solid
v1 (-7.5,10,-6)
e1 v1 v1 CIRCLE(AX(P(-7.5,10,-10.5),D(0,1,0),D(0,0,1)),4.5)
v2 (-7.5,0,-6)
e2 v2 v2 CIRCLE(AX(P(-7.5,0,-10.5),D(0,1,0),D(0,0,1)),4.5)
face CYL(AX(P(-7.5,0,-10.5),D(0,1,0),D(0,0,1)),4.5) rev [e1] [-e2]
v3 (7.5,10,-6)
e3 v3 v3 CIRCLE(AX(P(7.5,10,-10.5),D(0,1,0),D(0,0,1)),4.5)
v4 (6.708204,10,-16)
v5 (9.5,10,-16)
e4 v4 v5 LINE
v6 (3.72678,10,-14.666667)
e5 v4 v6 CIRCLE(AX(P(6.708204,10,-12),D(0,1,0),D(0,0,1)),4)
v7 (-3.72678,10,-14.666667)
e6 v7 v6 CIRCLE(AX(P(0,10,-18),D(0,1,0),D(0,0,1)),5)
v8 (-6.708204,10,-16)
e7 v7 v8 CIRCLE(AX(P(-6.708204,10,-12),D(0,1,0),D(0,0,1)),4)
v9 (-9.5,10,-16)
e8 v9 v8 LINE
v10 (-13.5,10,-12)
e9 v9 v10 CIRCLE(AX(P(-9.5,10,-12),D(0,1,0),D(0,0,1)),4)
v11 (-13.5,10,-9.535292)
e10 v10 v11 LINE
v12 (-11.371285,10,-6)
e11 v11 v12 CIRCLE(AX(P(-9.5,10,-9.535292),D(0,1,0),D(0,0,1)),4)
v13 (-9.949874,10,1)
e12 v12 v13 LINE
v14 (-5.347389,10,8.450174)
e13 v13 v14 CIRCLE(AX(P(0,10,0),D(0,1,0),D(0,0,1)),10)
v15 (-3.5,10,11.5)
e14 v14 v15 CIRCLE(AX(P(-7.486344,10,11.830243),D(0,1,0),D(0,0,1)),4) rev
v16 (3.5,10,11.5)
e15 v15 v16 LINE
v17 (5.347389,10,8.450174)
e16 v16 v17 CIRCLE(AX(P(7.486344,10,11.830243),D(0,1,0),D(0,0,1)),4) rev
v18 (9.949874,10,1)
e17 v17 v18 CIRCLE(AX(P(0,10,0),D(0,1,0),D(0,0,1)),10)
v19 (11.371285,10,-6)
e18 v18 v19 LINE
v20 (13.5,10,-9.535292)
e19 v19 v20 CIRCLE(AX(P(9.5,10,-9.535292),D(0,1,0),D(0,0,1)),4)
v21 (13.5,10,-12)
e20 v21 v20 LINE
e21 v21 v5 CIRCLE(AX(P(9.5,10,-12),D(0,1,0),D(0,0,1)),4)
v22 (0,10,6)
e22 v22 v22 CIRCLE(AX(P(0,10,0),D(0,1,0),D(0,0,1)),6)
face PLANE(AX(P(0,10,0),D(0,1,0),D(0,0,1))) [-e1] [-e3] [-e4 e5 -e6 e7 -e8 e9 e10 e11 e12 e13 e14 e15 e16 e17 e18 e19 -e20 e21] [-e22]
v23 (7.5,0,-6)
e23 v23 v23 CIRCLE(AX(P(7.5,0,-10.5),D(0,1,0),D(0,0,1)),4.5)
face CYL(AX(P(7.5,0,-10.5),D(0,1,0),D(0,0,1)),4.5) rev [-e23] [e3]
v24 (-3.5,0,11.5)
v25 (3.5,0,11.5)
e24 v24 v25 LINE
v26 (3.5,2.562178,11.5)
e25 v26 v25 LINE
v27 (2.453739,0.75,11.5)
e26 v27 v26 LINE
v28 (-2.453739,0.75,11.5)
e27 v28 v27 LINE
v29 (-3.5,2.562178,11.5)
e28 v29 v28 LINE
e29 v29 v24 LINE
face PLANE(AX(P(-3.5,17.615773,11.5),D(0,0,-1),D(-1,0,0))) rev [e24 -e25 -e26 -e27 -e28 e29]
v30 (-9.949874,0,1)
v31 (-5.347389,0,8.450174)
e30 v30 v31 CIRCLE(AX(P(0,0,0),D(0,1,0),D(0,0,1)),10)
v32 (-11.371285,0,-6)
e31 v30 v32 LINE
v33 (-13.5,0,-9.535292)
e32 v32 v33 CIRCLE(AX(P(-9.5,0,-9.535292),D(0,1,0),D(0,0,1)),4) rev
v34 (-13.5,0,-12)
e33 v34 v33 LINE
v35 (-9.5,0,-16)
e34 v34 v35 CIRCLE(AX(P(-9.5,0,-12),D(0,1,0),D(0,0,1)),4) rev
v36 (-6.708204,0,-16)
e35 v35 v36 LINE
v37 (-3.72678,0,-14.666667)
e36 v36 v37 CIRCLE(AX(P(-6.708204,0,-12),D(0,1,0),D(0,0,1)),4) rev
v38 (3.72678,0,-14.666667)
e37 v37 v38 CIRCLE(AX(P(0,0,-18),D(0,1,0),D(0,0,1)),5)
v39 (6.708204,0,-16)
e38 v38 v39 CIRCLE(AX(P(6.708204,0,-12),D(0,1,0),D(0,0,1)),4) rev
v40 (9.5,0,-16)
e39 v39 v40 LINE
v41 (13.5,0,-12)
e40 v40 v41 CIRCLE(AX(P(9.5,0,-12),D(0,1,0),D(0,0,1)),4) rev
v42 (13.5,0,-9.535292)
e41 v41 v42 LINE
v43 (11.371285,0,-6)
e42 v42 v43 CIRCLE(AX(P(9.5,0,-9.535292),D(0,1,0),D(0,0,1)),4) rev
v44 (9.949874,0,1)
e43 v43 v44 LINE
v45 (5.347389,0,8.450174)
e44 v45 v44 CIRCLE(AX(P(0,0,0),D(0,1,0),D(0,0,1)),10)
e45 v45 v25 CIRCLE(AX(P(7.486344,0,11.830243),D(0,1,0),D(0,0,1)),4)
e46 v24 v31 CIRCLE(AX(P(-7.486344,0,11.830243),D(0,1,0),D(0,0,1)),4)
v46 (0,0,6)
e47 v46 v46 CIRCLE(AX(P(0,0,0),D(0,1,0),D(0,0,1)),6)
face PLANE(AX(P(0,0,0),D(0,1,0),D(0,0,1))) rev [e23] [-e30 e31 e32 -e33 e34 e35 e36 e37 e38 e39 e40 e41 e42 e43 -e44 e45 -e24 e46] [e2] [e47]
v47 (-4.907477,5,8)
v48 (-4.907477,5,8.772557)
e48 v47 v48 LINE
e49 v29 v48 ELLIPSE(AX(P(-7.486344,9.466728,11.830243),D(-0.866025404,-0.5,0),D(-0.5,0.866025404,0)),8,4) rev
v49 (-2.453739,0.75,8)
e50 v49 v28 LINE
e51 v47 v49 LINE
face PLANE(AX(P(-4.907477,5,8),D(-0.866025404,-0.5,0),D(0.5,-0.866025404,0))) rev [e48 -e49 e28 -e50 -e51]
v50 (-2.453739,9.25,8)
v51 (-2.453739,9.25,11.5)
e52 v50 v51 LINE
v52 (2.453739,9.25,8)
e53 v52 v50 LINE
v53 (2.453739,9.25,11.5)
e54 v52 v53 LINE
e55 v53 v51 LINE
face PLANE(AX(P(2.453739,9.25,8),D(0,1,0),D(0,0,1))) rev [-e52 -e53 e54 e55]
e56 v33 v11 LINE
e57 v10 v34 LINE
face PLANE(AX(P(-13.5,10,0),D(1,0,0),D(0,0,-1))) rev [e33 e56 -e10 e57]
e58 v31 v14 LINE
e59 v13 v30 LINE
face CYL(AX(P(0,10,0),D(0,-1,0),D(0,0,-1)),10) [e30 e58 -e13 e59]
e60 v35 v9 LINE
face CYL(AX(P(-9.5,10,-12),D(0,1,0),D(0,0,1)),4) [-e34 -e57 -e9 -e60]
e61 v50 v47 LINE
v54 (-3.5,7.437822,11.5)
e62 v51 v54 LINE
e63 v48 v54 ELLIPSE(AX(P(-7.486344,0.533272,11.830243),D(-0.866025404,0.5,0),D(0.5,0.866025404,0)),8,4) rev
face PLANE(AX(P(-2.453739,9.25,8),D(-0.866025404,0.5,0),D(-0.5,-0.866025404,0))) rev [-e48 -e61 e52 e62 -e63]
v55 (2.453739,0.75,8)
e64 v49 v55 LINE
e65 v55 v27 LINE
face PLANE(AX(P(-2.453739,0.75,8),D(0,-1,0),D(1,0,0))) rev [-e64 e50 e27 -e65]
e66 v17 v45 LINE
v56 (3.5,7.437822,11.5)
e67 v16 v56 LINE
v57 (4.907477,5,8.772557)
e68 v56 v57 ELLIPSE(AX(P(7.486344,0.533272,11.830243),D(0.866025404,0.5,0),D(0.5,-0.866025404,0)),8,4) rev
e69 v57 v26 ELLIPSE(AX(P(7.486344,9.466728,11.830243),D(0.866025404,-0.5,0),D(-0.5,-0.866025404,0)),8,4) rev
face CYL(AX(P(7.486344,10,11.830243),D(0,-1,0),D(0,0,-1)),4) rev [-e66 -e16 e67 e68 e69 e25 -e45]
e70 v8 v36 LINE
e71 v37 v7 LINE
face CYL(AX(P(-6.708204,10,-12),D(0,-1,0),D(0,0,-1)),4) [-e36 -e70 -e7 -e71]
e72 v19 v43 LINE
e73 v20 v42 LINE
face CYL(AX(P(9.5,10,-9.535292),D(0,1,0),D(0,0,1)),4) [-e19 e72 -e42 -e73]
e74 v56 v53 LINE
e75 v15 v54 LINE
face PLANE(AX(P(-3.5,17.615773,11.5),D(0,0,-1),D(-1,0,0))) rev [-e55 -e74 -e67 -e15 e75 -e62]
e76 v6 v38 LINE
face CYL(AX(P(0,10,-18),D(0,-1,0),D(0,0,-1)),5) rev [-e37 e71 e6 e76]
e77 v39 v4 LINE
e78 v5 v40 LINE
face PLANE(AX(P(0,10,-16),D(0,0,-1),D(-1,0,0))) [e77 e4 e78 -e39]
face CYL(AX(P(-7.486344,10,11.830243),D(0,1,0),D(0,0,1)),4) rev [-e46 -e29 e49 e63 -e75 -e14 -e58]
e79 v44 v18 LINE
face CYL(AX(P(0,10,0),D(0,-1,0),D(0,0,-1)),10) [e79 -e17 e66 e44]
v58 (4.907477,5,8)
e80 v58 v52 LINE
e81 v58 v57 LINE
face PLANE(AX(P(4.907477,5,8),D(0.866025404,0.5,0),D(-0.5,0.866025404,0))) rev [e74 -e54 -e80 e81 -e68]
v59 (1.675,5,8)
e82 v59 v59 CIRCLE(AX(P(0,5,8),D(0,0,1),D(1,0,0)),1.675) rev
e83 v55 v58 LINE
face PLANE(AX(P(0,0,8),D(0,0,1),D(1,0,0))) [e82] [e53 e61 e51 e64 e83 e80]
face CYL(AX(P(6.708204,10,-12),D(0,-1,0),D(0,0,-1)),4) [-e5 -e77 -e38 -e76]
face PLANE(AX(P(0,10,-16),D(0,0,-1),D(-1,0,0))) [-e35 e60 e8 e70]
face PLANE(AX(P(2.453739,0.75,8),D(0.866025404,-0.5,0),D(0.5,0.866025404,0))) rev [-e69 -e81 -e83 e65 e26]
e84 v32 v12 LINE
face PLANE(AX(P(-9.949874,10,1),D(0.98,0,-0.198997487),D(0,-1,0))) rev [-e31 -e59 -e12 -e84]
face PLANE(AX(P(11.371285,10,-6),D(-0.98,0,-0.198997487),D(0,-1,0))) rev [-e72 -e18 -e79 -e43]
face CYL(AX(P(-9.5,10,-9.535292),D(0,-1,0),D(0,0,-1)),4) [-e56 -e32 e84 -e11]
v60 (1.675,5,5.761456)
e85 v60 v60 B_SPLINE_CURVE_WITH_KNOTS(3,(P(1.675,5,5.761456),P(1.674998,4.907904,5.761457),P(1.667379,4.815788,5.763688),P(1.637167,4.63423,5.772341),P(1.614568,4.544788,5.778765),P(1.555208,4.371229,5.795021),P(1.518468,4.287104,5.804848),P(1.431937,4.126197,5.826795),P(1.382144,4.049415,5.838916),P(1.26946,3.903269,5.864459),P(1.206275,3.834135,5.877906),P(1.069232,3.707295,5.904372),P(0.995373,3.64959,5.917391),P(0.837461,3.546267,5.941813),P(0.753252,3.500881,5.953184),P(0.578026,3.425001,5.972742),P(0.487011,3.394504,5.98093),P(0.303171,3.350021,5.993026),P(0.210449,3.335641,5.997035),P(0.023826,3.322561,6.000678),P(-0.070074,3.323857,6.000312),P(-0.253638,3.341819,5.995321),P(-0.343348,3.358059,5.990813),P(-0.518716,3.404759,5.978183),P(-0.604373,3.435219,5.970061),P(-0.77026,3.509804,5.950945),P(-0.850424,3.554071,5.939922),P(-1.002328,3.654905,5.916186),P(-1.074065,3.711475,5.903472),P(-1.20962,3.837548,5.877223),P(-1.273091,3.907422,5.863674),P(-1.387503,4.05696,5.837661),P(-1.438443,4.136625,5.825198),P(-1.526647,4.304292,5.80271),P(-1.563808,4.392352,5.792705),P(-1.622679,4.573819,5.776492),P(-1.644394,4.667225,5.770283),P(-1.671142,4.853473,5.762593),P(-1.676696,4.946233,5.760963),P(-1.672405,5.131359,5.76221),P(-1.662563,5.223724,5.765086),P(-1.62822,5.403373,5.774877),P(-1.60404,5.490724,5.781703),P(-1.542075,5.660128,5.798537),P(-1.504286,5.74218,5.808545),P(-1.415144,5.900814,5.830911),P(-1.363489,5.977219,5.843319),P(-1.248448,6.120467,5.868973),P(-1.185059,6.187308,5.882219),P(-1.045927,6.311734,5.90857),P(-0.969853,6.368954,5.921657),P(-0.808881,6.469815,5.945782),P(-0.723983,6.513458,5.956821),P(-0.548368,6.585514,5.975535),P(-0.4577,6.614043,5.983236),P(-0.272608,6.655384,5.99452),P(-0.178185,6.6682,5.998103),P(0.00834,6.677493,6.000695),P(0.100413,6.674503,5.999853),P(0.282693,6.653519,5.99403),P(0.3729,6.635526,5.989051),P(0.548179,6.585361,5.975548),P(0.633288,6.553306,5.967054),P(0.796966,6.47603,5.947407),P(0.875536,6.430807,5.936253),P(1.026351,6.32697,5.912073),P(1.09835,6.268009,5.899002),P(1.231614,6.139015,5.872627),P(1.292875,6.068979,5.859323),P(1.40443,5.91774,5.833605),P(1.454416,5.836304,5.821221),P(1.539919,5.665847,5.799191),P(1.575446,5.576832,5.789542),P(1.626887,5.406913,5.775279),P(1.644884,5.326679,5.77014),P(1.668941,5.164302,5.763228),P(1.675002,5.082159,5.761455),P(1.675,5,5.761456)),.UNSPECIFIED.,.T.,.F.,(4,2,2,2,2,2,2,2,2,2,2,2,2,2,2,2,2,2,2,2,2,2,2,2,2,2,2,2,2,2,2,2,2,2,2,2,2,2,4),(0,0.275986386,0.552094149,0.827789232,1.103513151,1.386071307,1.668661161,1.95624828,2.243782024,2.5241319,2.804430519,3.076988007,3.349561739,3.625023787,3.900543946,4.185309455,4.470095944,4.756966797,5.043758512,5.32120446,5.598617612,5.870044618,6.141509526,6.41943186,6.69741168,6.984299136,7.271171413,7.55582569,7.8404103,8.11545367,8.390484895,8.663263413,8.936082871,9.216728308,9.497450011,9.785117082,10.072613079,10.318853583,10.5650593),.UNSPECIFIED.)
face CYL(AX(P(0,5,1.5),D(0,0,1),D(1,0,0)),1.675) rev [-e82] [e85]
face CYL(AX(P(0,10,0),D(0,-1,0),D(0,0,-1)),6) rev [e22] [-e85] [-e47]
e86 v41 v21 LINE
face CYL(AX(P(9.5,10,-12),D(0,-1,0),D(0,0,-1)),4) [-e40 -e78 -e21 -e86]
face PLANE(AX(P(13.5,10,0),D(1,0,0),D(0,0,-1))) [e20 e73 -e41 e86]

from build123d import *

# Parameters (mm, degrees)
CROQUIS1_R              = 10
CROQUIS1_R_2            = 6
SALIENTE_EXTRUIR1_DEPTH = 10
CROQUIS2_R              = 4.5
CORTAR_EXTRUIR1_DEPTH   = 10
CHAFL_N1_DEPTH          = 10
CROQUIS3_W              = 7
CROQUIS3_H              = 3
SALIENTE_EXTRUIR2_DEPTH = 10
CROQUIS4_R              = 1.675
CORTAR_EXTRUIR2_DEPTH   = 10
REDONDEO2_R             = 4
CORTAR_EXTRUIR3_DEPTH   = 3.5


with BuildPart() as part:
    # Croquis1 → Saliente-Extruir1 (new body)
    # profile 1 of 2: a face of its own
    with BuildSketch(Plane(origin=(0, 0, 0), x_dir=(1, 0, 0), z_dir=(0, 1, 0))):
        Circle(CROQUIS1_R)
        with Locations(Location((0, 0, 0), (0, 0, 270))):
            Circle(CROQUIS1_R_2, mode=Mode.SUBTRACT)
    # profile 2 of 2: a face of its own
    with BuildSketch(Plane(origin=(0, 0, 0), x_dir=(1, 0, 0), z_dir=(0, 1, 0))):
        with BuildLine():
            Line((-13.5, 16), (-4.582575695, 16))
            ThreePointArc((-4.582575695, 16), (0, 13), (4.582575695, 16))
            Line((4.582575695, 16), (13.5, 16))
            Line((13.5, 16), (13.5, 6))
            Line((13.5, 6), (-13.5, 6))
            Line((-13.5, 6), (-13.5, 16))
        make_face()
    extrude(amount=SALIENTE_EXTRUIR1_DEPTH)

    # Croquis2 → Cortar-Extruir1 (cut)
    with BuildSketch(Plane(origin=(0, 10, 0), x_dir=(1, 0, 0), z_dir=(0, 1, 0))):
        with Locations(Location((-7.5, 10.5, 0), (0, 0, 270))):
            Circle(CROQUIS2_R)
        with Locations(Location((7.5, 10.5, 0), (0, 0, 270))):
            Circle(CROQUIS2_R)
    extrude(amount=-CORTAR_EXTRUIR1_DEPTH, mode=Mode.SUBTRACT)

    # Chaflán1: read off the stored shape, not the designer's step
    # Chaflán1 outline → Chaflán1 (add)
    with BuildSketch(Plane(origin=(0, 0, 0), x_dir=(1, 0, 0), z_dir=(0, 1, 0))):
        with BuildLine():
            ThreePointArc((8, 6), (9.633249581, 2.68337521), (9.949874371, -1))
            Line((9.949874371, -1), (11.371284996, 6))
            Line((11.371284996, 6), (8, 6))
        make_face()
        with BuildLine():
            Line((-11.371284996, 6), (-9.949874371, -1))
            ThreePointArc((-9.949874371, -1), (-9.633249581, 2.68337521), (-8, 6))
            Line((-8, 6), (-11.371284996, 6))
        make_face()
    extrude(amount=CHAFL_N1_DEPTH)

    # Croquis3 → Saliente-Extruir2 (add)
    with BuildSketch(Plane(origin=(0, 0, 0), x_dir=(1, 0, 0), z_dir=(0, 1, 0))):
        with Locations((0, -10)):
            Rectangle(CROQUIS3_W, CROQUIS3_H)
    extrude(amount=SALIENTE_EXTRUIR2_DEPTH)

    # Croquis4 → Cortar-Extruir2 (cut)
    with BuildSketch(Plane.XY.offset(11.5)):
        with Locations((0, 5)):
            Circle(CROQUIS4_R)
    extrude(amount=-CORTAR_EXTRUIR2_DEPTH, mode=Mode.SUBTRACT)

    # Redondeo2
    # the kernel refuses this fillet: 4 mm, written as the material it adds along each edge
    with BuildSketch(Plane(origin=(-3.5, 10, 9.367496998), x_dir=(-0.8956592986601979, 0, -0.4447408467001005), z_dir=(0, -1, 0))) as redondeo2_piece_1:
        with BuildLine():
            CenterArc((2.475122402, -3.978671502), REDONDEO2_R, 95.919444292, 52.938021971)
            Line((-0.948411191, -1.909996144), (-1.016881863, -1.868622636))
            ThreePointArc((-1.016881863, -1.868622636), (-0.545858339, -0.919418804), (-0.071652744, 0.035579268))
            Line((-0.071652744, 0.035579268), (0.008250408, 0.07957343))
            ThreePointArc((0.008250408, 0.07957343), (1.031301001, 0.026678755), (2.054351594, 0.07957343))
            Line((2.054351594, 0.07957343), (2.062602002, 0))
        make_face()
    extrude(amount=10)
    with BuildSketch(Plane(origin=(3.5, 10, 9.367496998), x_dir=(0, 0, 1), z_dir=(0, -1, 0))) as redondeo2_piece_2:
        with BuildLine():
            CenterArc((2.462746094, -3.986344127), REDONDEO2_R, 94.735774331, 52.938021971)
            Line((-0.917323361, -1.847388662), (-0.98492475, -1.804609553))
            ThreePointArc((-0.98492475, -1.804609553), (-0.482556755, -0.911829199), (-0.074939976, 0.028))
            Line((-0.074939976, 0.028), (0, 0.08))
            ThreePointArc((0, 0.08), (1.066251501, 0.08), (2.125898141, 0.079726883))
            Line((2.125898141, 0.079726883), (2.132503002, 0))
        make_face()
    extrude(amount=10)
    # the kernel refuses this fillet: 4 mm, written as the material it takes off along each edge
    with BuildSketch(Plane(origin=(13.5, -10, -16), x_dir=(-1, 0, 0), z_dir=(0, 1, 0)), Plane(origin=(-13.5, -10, -16), x_dir=(0, 0, 1), z_dir=(0, 1, 0))) as redondeo2_2_piece_1:
        with BuildLine():
            CenterArc((REDONDEO2_R, REDONDEO2_R), REDONDEO2_R, 180, 90)
            Line((0, REDONDEO2_R), (-REDONDEO2_R * 0.02, REDONDEO2_R))
            Line((-REDONDEO2_R * 0.02, REDONDEO2_R), (-REDONDEO2_R * 0.02, -REDONDEO2_R * 0.02))
            Line((-REDONDEO2_R * 0.02, -REDONDEO2_R * 0.02), (REDONDEO2_R, -REDONDEO2_R * 0.02))
            Line((REDONDEO2_R, -REDONDEO2_R * 0.02), (REDONDEO2_R, 0))
        make_face()
    extrude(amount=30, mode=Mode.SUBTRACT)
    with BuildSketch(Plane(origin=(13.5, -8.838231039, -6), x_dir=(0, 0, -1), z_dir=(0, 1, 0))) as redondeo2_2_piece_2:
        with BuildLine():
            CenterArc((3.535292416, 4), REDONDEO2_R, 207.892961789, 62.107038211)
            Line((0, 2.128715004), (-0.070705848, 2.091289304))
            ThreePointArc((-0.070705848, 2.091289304), (-0.08, 1.064357502), (-0.08, 0))
            Line((-0.08, 0), (0, -0.08))
            Line((0, -0.08), (3.535292416, -0.08))
            Line((3.535292416, -0.08), (3.535292416, 0))
        make_face()
    extrude(amount=27.676462078, mode=Mode.SUBTRACT)
    with BuildSketch(Plane(origin=(-13.5, -8.838231039, -6), x_dir=(1, 0, 0), z_dir=(0, 1, 0))) as redondeo2_2_piece_3:
        with BuildLine():
            CenterArc((4, 3.535292416), REDONDEO2_R, 180, 62.107038211)
            Line((0, 3.535292416), (-0.08, 3.535292416))
            Line((-0.08, 3.535292416), (-0.08, 0))
            Line((-0.08, 0), (0, -0.08))
            ThreePointArc((0, -0.08), (1.064357502, -0.08), (2.091289304, -0.070705848))
            Line((2.091289304, -0.070705848), (2.128715004, 0))
        make_face()
    extrude(amount=27.676462078, mode=Mode.SUBTRACT)
    with BuildSketch(Plane(origin=(4.582575695, -5.314070594, -16), x_dir=(-0.5401558180759948, 0, 0.8415650255319863), z_dir=(0, 1, 0))) as redondeo2_2_piece_4:
        with BuildLine():
            CenterArc((2.218089643, 3.949477654), REDONDEO2_R, 212.694246687, 48.189685104)
            Line((-1.14817046, 1.788854382), (-1.215495662, 1.745641917))
            Line((-1.215495662, 1.745641917), (-0.067325202, -0.043212465))
            Line((-0.067325202, -0.043212465), (0.012674798, -0.078989553))
            ThreePointArc((0.012674798, -0.078989553), (0.792174872, -0.016847068), (1.571674947, -0.078989553))
            Line((1.571674947, -0.078989553), (1.584349745, 0))
        make_face()
    extrude(amount=20.628141188, mode=Mode.SUBTRACT)
    with BuildSketch(Plane(origin=(-4.582575695, -5.314070594, -16), x_dir=(-1, 0, 0), z_dir=(0, 1, 0))) as redondeo2_2_piece_5:
        with BuildLine():
            CenterArc((2.125628238, 4), REDONDEO2_R, 221.810314896, 48.189685104)
            Line((-0.855795732, 1.333333333), (-0.915424212, 1.28))
            ThreePointArc((-0.915424212, 1.28), (-0.442075769, 0.657566625), (-0.073321211, -0.032))
            Line((-0.073321211, -0.032), (0, -0.08))
            Line((0, -0.08), (2.125628238, -0.08))
            Line((2.125628238, -0.08), (2.125628238, 0))
        make_face()
    extrude(amount=20.628141188, mode=Mode.SUBTRACT)

    # Croquis5 → Cortar-Extruir3 (cut)
    with BuildSketch(Plane.XY.offset(11.5)):
        Polygon((4.907477288, 5), (2.453738644, 9.25), (-2.453738644, 9.25), (-4.907477288, 5), (-2.453738644, 0.75), (2.453738644, 0.75), align=None)
    extrude(amount=-CORTAR_EXTRUIR3_DEPTH, mode=Mode.SUBTRACT)


solid = part.part
